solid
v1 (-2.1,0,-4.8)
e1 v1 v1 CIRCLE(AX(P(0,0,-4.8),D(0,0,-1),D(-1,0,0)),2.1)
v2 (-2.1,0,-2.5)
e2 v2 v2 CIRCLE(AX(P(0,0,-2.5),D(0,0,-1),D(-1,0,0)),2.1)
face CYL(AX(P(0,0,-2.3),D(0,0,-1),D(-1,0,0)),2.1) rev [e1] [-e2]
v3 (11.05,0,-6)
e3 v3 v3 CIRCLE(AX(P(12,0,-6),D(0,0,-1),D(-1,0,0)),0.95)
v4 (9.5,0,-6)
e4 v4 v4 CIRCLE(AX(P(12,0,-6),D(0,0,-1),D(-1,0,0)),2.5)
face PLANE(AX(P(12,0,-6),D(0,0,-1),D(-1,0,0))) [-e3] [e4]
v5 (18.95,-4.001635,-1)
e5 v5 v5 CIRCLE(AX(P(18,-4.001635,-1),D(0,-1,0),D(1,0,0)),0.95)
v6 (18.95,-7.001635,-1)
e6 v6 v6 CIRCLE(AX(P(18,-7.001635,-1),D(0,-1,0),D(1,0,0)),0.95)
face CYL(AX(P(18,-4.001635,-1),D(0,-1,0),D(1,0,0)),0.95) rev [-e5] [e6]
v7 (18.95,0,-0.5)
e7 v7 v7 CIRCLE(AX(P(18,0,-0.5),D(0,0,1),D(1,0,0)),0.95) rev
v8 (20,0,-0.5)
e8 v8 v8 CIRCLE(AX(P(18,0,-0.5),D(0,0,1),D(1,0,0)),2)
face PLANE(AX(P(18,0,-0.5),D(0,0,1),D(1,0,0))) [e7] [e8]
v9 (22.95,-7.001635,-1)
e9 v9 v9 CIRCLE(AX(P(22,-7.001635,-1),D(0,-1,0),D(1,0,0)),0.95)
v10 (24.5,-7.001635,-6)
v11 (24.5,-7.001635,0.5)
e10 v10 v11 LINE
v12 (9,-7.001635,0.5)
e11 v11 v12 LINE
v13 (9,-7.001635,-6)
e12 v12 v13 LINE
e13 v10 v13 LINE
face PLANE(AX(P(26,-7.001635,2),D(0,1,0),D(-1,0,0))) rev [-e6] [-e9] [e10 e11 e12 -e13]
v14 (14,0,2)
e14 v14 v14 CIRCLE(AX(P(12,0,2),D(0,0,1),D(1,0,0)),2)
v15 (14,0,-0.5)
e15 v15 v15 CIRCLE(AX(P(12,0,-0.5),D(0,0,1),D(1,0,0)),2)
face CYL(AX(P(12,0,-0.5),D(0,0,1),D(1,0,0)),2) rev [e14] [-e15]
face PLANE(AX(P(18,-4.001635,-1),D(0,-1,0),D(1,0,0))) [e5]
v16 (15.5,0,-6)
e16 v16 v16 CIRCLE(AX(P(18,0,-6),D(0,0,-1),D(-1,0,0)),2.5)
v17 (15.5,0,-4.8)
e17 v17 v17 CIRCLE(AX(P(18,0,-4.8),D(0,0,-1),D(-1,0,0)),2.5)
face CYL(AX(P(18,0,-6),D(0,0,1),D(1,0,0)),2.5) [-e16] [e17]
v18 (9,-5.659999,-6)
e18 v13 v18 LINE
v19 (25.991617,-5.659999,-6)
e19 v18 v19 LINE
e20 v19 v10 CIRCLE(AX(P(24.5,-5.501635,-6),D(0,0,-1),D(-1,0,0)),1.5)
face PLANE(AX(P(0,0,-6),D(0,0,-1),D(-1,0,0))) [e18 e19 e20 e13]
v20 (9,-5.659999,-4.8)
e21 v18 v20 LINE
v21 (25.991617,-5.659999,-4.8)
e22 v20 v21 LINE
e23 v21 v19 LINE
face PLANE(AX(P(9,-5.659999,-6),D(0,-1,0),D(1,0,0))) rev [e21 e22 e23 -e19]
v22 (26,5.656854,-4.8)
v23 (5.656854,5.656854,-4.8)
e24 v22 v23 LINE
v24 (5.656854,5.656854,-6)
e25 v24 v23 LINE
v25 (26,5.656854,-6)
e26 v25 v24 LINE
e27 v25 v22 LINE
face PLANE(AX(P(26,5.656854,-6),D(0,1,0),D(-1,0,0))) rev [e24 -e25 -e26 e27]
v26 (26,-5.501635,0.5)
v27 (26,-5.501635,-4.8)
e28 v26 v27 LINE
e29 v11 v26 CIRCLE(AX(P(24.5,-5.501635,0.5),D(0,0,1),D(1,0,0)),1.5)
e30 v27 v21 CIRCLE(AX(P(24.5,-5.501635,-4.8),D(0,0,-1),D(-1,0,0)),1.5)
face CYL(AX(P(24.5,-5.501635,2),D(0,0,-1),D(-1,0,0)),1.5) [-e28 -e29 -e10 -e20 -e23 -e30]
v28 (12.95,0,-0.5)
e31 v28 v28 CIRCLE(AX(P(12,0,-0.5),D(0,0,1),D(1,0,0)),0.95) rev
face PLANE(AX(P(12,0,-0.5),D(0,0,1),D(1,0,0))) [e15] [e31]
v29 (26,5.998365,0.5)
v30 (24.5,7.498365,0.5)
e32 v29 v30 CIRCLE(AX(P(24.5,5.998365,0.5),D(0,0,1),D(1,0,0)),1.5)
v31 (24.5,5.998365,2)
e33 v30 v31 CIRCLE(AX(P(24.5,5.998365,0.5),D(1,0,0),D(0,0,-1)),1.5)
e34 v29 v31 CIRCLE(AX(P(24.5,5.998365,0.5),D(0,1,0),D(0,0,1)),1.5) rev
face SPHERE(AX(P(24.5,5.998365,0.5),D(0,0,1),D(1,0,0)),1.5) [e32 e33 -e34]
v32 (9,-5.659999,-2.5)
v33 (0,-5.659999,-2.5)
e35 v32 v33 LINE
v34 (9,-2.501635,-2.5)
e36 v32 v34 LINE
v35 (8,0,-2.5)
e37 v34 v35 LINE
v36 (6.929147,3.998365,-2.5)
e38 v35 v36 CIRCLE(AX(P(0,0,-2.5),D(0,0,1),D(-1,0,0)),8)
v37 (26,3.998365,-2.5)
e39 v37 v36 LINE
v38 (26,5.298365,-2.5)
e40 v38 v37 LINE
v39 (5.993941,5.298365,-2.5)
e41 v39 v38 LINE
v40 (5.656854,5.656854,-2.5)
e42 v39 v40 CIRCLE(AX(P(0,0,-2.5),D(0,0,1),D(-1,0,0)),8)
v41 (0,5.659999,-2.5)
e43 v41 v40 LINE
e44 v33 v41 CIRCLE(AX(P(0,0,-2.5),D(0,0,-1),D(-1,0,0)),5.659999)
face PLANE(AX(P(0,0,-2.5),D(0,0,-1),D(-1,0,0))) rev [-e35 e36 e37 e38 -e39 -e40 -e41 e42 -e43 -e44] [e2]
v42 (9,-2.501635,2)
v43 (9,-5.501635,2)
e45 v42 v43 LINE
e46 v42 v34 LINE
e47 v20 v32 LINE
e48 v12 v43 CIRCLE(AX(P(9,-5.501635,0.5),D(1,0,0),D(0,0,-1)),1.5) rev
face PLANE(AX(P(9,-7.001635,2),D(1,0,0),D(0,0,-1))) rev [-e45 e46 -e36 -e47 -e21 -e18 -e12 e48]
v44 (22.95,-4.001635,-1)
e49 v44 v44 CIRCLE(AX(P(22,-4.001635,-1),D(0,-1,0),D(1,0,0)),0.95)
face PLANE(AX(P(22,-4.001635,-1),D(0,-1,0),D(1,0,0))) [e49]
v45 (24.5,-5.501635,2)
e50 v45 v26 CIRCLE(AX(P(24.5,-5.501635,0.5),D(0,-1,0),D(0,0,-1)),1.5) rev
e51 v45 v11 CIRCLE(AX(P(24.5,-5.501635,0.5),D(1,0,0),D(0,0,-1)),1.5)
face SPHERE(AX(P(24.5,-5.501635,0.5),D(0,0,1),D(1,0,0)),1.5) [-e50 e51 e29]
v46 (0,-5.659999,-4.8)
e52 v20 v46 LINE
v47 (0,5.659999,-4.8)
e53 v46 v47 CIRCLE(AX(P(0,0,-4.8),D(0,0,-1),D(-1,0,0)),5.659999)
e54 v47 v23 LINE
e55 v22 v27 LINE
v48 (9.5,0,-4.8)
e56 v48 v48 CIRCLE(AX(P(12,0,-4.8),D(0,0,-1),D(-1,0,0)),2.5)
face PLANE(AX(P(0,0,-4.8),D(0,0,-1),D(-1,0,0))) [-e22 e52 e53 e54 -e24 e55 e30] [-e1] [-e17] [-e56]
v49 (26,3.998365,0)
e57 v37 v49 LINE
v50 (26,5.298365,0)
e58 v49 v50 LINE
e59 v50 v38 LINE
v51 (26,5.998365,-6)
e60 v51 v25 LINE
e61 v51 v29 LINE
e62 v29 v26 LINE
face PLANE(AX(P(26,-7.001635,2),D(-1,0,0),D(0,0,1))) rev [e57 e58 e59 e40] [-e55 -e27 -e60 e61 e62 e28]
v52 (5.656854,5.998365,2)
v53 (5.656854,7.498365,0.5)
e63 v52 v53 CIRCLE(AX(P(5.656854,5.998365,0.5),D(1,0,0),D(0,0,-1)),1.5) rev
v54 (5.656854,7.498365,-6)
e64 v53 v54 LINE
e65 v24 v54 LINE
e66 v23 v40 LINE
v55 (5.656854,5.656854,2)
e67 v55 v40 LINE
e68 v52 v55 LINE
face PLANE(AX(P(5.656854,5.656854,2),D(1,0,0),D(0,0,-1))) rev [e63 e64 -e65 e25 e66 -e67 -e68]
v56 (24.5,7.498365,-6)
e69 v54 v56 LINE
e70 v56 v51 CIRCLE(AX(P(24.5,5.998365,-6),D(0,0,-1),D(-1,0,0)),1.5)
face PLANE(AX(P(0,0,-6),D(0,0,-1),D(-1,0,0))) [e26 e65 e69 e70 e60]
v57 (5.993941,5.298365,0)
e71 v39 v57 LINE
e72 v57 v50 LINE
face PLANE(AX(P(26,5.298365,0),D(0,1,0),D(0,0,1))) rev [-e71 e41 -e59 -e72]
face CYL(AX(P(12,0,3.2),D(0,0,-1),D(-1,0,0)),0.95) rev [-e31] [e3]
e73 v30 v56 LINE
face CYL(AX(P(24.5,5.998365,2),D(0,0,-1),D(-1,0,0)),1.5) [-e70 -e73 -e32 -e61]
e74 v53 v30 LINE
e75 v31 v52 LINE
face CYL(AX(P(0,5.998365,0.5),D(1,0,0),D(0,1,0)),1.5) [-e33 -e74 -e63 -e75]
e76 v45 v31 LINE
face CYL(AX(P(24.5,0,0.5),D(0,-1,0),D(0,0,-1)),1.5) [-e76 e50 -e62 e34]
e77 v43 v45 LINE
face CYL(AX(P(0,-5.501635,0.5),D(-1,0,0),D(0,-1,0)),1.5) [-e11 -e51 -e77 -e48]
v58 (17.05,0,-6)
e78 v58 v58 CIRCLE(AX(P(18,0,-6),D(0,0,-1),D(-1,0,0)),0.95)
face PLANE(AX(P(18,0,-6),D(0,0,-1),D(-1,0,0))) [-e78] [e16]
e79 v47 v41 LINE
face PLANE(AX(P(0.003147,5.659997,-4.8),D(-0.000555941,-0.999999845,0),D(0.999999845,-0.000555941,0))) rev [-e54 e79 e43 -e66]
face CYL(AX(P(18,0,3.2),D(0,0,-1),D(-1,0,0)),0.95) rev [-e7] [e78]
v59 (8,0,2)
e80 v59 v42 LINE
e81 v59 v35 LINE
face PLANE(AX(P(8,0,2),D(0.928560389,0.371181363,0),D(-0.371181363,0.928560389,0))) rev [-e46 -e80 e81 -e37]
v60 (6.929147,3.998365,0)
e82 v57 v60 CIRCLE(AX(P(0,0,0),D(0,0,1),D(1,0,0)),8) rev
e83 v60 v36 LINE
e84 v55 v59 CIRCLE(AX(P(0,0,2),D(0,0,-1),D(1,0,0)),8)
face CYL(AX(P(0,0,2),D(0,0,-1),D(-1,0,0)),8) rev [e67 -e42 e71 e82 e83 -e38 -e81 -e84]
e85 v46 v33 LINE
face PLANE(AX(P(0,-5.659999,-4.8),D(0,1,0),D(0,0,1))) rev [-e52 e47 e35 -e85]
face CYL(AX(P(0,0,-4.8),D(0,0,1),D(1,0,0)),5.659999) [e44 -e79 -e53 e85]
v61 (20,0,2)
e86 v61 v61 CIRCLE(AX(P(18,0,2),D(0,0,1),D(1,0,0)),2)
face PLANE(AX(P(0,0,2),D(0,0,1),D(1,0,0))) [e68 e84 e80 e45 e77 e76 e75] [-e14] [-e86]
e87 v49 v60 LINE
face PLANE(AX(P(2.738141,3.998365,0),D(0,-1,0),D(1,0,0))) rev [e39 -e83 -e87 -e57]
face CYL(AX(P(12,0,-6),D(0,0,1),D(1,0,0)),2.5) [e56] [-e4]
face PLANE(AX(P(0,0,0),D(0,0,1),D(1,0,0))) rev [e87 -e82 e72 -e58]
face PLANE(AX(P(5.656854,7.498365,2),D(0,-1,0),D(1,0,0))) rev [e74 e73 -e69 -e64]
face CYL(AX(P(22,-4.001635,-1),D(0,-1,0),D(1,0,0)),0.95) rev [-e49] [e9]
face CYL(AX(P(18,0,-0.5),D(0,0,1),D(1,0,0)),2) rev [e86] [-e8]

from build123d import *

# Parameters (mm, degrees)
BOSS_EXTRUDE1_DEPTH = 2
BOSS_EXTRUDE2_START = 2.5
BOSS_EXTRUDE2_DEPTH = 2.5
CUT_EXTRUDE1_DEPTH  = 2.5
BOSS_EXTRUDE3_DEPTH = 2.3
SKETCH9_R           = 2.1
CUT_EXTRUDE2_DEPTH  = 2.5
SKETCH10_R          = 2.5
BOSS_EXTRUDE4_DEPTH = 1.2
SKETCH11_R          = 0.95
CUT_EXTRUDE3_DEPTH  = 9.2
SKETCH12_R          = 2
CUT_EXTRUDE4_DEPTH  = 2.5
SKETCH14_W          = 20.343145751
SKETCH14_H          = 1.841510486
SKETCH14_W_2        = 17
SKETCH14_H_2        = 1.34163614
BOSS_EXTRUDE5_DEPTH = 1.2
FILLET1_R           = 1.5
SKETCH17_R          = 0.95
CUT_EXTRUDE5_DEPTH  = 3


# Read off the part's stored shape, not the designer's step: Boss-Extrude3
with BuildPart() as part:
    # Sketch5 → Boss-Extrude1 (new body)
    with BuildSketch(Plane.XY):
        with BuildLine():
            Line((8, 0), (9, -2.501635265))
            Line((9, -2.501635265), (9, -7.001635265))
            Line((9, -7.001635265), (26, -7.001635265))
            Line((26, -7.001635265), (26, 7.498364735))
            Line((26, 7.498364735), (5.656854249, 7.498364735))
            Line((5.656854249, 7.498364735), (5.656854249, 5.656854249))
            ThreePointArc((5.656854249, 5.656854249), (7.39103626, 3.061467459), (8, 0))
        make_face()
    extrude(amount=BOSS_EXTRUDE1_DEPTH)

    # Sketch6 → Boss-Extrude2 (add)
    with BuildSketch(Plane(origin=(0, 0, 0), x_dir=(-1, 0, 0), z_dir=(0, 0, -1)).offset(BOSS_EXTRUDE2_START)):
        with BuildLine():
            Line((-5.656854249, 7.498364735), (-5.656854249, 5.656854249))
            ThreePointArc((-5.656854249, 5.656854249), (-7.39103626, 3.061467459), (-8, 0))
            Line((-8, 0), (-9, -2.501635265))
            Line((-9, -2.501635265), (-9, -7.001635265))
            Line((-9, -7.001635265), (-26, -7.001635265))
            Line((-26, -7.001635265), (-26, 7.498364735))
            Line((-26, 7.498364735), (-5.656854249, 7.498364735))
        make_face()
    extrude(amount=-BOSS_EXTRUDE2_DEPTH)

    # Sketch7 → Cut-Extrude1 (cut)
    with BuildSketch(Plane(origin=(0, 0, -2.5), x_dir=(-1, 0, 0), z_dir=(0, 0, -1))):
        Polygon((-26, 5.298364735), (-2.738141148, 5.298364735), (-2.738141148, 3.998364735), (-29.849535112, 3.998364735), (-29.849535112, 5.298364735), align=None)
    extrude(amount=-CUT_EXTRUDE1_DEPTH, mode=Mode.SUBTRACT)

    # Boss-Extrude3 outline → Boss-Extrude3 (add)
    with BuildSketch(Plane(origin=(0, 0, -2.5), x_dir=(-1, 0, 0), z_dir=(0, 0, -1))):
        with BuildLine():
            Line((-9, -7.001635265), (-9, -5.659999125))
            Line((-9, -5.659999125), (0, -5.659998688))
            ThreePointArc((0, -5.659998688), (5.659998688, 0), (0, 5.659998688))
            Line((0, 5.659998688), (-5.656854249, 5.656854249))
            Line((-5.656854249, 5.656854249), (-5.656854249, 7.498364735))
            Line((-5.656854249, 7.498364735), (-26, 7.498364735))
            Line((-26, 7.498364735), (-26, -7.001635265))
            Line((-26, -7.001635265), (-9, -7.001635265))
        make_face()
    extrude(amount=BOSS_EXTRUDE3_DEPTH)

    # Sketch9 → Cut-Extrude2 (cut)
    with BuildSketch(Plane(origin=(0, 0, -4.8), x_dir=(-1, 0, 0), z_dir=(0, 0, -1))):
        Circle(SKETCH9_R)
    extrude(amount=-CUT_EXTRUDE2_DEPTH, mode=Mode.SUBTRACT)

    # Sketch10 → Boss-Extrude4 (add)
    with BuildSketch(Plane(origin=(0, 0, -4.8), x_dir=(-1, 0, 0), z_dir=(0, 0, -1))):
        with Locations((-12, 0)):
            Circle(SKETCH10_R)
        with Locations((-18, 0)):
            Circle(SKETCH10_R)
    extrude(amount=BOSS_EXTRUDE4_DEPTH)

    # Sketch11 → Cut-Extrude3 (cut)
    with BuildSketch(Plane(origin=(0, 0, -6), x_dir=(-1, 0, 0), z_dir=(0, 0, -1))):
        with Locations((-18, 0)):
            Circle(SKETCH11_R)
        with Locations((-12, 0)):
            Circle(SKETCH11_R)
    extrude(amount=-CUT_EXTRUDE3_DEPTH, mode=Mode.SUBTRACT)

    # Sketch12 → Cut-Extrude4 (cut)
    with BuildSketch(Plane.XY.offset(2)):
        with Locations((12, 0)):
            Circle(SKETCH12_R)
        with Locations((18, 0)):
            Circle(SKETCH12_R)
    extrude(amount=-CUT_EXTRUDE4_DEPTH, mode=Mode.SUBTRACT)

    # Sketch14 → Boss-Extrude5 (add)
    with BuildSketch(Plane(origin=(0, 0, -4.8), x_dir=(-1, 0, 0), z_dir=(0, 0, -1))):
        with Locations((-15.828427124, 6.577609492)):
            Rectangle(SKETCH14_W, SKETCH14_H)
        with Locations((-17.5, -6.330817195)):
            Rectangle(SKETCH14_W_2, SKETCH14_H_2)
    extrude(amount=BOSS_EXTRUDE5_DEPTH)

    # Fillet1
    # the kernel refuses this fillet: 1.5 mm, written as the material it takes off along each edge
    with BuildSketch(Plane(origin=(24.5, -5.501635265, 0.5), x_dir=(0, 0, 1), z_dir=(0, -1, 0))) as fillet1_piece_1_section:
        Polygon((0, 0), (FILLET1_R, 0), (FILLET1_R, -FILLET1_R), (0, -FILLET1_R), align=None)
    fillet1_piece_1 = extrude(amount=FILLET1_R, mode=Mode.PRIVATE)
    fillet1_piece_1 = fillet1_piece_1 - Plane(origin=(24.5, -5.501635265, 0.5), x_dir=(-0.7071067811865475, 0, -0.7071067811865475), z_dir=(0, -1, 0)) * Sphere(FILLET1_R, mode=Mode.PRIVATE)
    add(fillet1_piece_1, mode=Mode.SUBTRACT)
    with BuildSketch(Plane(origin=(24.5, 5.998364735, 0.5), x_dir=(0, 0, 1), z_dir=(0, 1, 0))) as fillet1_piece_2_section:
        Polygon((0, 0), (FILLET1_R, 0), (FILLET1_R, FILLET1_R), (0, FILLET1_R), align=None)
    fillet1_piece_2 = extrude(amount=FILLET1_R, mode=Mode.PRIVATE)
    fillet1_piece_2 = fillet1_piece_2 - Plane(origin=(24.5, 5.998364735, 0.5), x_dir=(-0.7071067811865475, 0, -0.7071067811865475), z_dir=(0, 1, 0)) * Sphere(FILLET1_R, mode=Mode.PRIVATE)
    add(fillet1_piece_2, mode=Mode.SUBTRACT)
    with BuildSketch(Plane(origin=(26, -5.501635265, 2), x_dir=(-1, 0, 0), z_dir=(0, 1, 0))) as fillet1_piece_3:
        with BuildLine():
            CenterArc((FILLET1_R, -FILLET1_R), FILLET1_R, 90, 90)
            Line((0, -FILLET1_R), (0, 0))
            Line((0, 0), (FILLET1_R, 0))
        make_face()
    extrude(amount=11.5, mode=Mode.SUBTRACT)
    with BuildSketch(Plane(origin=(26, -7.001635265, -2.5), x_dir=(-1, 0, 0), z_dir=(0, 0, 1))) as fillet1_piece_4:
        with BuildLine():
            CenterArc((FILLET1_R, -FILLET1_R), FILLET1_R, 90, 90)
            Line((0, -FILLET1_R), (0, 0))
            Line((0, 0), (FILLET1_R, 0))
        make_face()
    extrude(amount=3, mode=Mode.SUBTRACT)
    with BuildSketch(Plane(origin=(5.25, -7.001635265, 2), x_dir=(0, 1, 0), z_dir=(1, 0, 0))) as fillet1_piece_5:
        with BuildLine():
            CenterArc((FILLET1_R, -FILLET1_R), FILLET1_R, 90, 90)
            Line((0, -FILLET1_R), (0, 0))
            Line((0, 0), (FILLET1_R, 0))
        make_face()
    extrude(amount=19.25, mode=Mode.SUBTRACT)
    with BuildSketch(Plane(origin=(24.5, 7.498364735, 2), x_dir=(0, -1, 0), z_dir=(-1, 0, 0))) as fillet1_piece_6:
        with BuildLine():
            CenterArc((FILLET1_R, -FILLET1_R), FILLET1_R, 90, 90)
            Line((0, -FILLET1_R), (0, 0))
            Line((0, 0), (FILLET1_R, 0))
        make_face()
    extrude(amount=22.593145751, mode=Mode.SUBTRACT)
    with BuildSketch(Plane(origin=(26, 7.498364735, -2.5), x_dir=(-1, 0, 0), z_dir=(0, 0, 1))) as fillet1_piece_7:
        with BuildLine():
            CenterArc((FILLET1_R, FILLET1_R), FILLET1_R, 180, 90)
            Line((0, FILLET1_R), (0, 0))
            Line((0, 0), (FILLET1_R, 0))
        make_face()
    extrude(amount=3, mode=Mode.SUBTRACT)
    with BuildSketch(Plane(origin=(26, 7.498364735, -2.5), x_dir=(-1.0, -1.9174232572065026e-10, 0), z_dir=(0, 0, -1))) as fillet1_piece_8:
        with BuildLine():
            CenterArc((FILLET1_R, -FILLET1_R), FILLET1_R, 90.000000011, 90)
            Line((FILLET1_R * 1.9173522033e-10, -FILLET1_R), (0, 0))
            Line((0, 0), (FILLET1_R, 0))
        make_face()
    extrude(amount=2.3, mode=Mode.SUBTRACT)
    with BuildSketch(Plane(origin=(26, 7.498364735, -4.8), x_dir=(-1, 0, 0), z_dir=(0, 0, -1))) as fillet1_piece_9:
        with BuildLine():
            CenterArc((FILLET1_R, -FILLET1_R), FILLET1_R, 90, 90)
            Line((0, -FILLET1_R), (0, 0))
            Line((0, 0), (FILLET1_R, 0))
        make_face()
    extrude(amount=4.95, mode=Mode.SUBTRACT)
    with BuildSketch(Plane(origin=(26, -7.001635265, -2.5), x_dir=(-1.0, -1.9169850891861218e-10, 0), z_dir=(0, 0, -1))) as fillet1_piece_10:
        with BuildLine():
            CenterArc((FILLET1_R, FILLET1_R), FILLET1_R, 180.000000011, 90)
            Line((-FILLET1_R * 1.91707982785e-10, FILLET1_R), (0, 0))
            Line((0, 0), (FILLET1_R, 0))
        make_face()
    extrude(amount=2.3, mode=Mode.SUBTRACT)
    with BuildSketch(Plane(origin=(26, -7.001635265, -4.8), x_dir=(-1, 0, 0), z_dir=(0, 0, -1))) as fillet1_piece_11:
        with BuildLine():
            CenterArc((FILLET1_R, FILLET1_R), FILLET1_R, 180, 90)
            Line((0, FILLET1_R), (0, 0))
            Line((0, 0), (FILLET1_R, 0))
        make_face()
    extrude(amount=4.95, mode=Mode.SUBTRACT)

    # Sketch17 → Cut-Extrude5 (cut)
    with BuildSketch(Plane.XZ.offset(7.001635265)):
        with Locations((22, -1)):
            Circle(SKETCH17_R)
        with Locations((18, -1)):
            Circle(SKETCH17_R)
    extrude(amount=-CUT_EXTRUDE5_DEPTH, mode=Mode.SUBTRACT)


solid = part.part
